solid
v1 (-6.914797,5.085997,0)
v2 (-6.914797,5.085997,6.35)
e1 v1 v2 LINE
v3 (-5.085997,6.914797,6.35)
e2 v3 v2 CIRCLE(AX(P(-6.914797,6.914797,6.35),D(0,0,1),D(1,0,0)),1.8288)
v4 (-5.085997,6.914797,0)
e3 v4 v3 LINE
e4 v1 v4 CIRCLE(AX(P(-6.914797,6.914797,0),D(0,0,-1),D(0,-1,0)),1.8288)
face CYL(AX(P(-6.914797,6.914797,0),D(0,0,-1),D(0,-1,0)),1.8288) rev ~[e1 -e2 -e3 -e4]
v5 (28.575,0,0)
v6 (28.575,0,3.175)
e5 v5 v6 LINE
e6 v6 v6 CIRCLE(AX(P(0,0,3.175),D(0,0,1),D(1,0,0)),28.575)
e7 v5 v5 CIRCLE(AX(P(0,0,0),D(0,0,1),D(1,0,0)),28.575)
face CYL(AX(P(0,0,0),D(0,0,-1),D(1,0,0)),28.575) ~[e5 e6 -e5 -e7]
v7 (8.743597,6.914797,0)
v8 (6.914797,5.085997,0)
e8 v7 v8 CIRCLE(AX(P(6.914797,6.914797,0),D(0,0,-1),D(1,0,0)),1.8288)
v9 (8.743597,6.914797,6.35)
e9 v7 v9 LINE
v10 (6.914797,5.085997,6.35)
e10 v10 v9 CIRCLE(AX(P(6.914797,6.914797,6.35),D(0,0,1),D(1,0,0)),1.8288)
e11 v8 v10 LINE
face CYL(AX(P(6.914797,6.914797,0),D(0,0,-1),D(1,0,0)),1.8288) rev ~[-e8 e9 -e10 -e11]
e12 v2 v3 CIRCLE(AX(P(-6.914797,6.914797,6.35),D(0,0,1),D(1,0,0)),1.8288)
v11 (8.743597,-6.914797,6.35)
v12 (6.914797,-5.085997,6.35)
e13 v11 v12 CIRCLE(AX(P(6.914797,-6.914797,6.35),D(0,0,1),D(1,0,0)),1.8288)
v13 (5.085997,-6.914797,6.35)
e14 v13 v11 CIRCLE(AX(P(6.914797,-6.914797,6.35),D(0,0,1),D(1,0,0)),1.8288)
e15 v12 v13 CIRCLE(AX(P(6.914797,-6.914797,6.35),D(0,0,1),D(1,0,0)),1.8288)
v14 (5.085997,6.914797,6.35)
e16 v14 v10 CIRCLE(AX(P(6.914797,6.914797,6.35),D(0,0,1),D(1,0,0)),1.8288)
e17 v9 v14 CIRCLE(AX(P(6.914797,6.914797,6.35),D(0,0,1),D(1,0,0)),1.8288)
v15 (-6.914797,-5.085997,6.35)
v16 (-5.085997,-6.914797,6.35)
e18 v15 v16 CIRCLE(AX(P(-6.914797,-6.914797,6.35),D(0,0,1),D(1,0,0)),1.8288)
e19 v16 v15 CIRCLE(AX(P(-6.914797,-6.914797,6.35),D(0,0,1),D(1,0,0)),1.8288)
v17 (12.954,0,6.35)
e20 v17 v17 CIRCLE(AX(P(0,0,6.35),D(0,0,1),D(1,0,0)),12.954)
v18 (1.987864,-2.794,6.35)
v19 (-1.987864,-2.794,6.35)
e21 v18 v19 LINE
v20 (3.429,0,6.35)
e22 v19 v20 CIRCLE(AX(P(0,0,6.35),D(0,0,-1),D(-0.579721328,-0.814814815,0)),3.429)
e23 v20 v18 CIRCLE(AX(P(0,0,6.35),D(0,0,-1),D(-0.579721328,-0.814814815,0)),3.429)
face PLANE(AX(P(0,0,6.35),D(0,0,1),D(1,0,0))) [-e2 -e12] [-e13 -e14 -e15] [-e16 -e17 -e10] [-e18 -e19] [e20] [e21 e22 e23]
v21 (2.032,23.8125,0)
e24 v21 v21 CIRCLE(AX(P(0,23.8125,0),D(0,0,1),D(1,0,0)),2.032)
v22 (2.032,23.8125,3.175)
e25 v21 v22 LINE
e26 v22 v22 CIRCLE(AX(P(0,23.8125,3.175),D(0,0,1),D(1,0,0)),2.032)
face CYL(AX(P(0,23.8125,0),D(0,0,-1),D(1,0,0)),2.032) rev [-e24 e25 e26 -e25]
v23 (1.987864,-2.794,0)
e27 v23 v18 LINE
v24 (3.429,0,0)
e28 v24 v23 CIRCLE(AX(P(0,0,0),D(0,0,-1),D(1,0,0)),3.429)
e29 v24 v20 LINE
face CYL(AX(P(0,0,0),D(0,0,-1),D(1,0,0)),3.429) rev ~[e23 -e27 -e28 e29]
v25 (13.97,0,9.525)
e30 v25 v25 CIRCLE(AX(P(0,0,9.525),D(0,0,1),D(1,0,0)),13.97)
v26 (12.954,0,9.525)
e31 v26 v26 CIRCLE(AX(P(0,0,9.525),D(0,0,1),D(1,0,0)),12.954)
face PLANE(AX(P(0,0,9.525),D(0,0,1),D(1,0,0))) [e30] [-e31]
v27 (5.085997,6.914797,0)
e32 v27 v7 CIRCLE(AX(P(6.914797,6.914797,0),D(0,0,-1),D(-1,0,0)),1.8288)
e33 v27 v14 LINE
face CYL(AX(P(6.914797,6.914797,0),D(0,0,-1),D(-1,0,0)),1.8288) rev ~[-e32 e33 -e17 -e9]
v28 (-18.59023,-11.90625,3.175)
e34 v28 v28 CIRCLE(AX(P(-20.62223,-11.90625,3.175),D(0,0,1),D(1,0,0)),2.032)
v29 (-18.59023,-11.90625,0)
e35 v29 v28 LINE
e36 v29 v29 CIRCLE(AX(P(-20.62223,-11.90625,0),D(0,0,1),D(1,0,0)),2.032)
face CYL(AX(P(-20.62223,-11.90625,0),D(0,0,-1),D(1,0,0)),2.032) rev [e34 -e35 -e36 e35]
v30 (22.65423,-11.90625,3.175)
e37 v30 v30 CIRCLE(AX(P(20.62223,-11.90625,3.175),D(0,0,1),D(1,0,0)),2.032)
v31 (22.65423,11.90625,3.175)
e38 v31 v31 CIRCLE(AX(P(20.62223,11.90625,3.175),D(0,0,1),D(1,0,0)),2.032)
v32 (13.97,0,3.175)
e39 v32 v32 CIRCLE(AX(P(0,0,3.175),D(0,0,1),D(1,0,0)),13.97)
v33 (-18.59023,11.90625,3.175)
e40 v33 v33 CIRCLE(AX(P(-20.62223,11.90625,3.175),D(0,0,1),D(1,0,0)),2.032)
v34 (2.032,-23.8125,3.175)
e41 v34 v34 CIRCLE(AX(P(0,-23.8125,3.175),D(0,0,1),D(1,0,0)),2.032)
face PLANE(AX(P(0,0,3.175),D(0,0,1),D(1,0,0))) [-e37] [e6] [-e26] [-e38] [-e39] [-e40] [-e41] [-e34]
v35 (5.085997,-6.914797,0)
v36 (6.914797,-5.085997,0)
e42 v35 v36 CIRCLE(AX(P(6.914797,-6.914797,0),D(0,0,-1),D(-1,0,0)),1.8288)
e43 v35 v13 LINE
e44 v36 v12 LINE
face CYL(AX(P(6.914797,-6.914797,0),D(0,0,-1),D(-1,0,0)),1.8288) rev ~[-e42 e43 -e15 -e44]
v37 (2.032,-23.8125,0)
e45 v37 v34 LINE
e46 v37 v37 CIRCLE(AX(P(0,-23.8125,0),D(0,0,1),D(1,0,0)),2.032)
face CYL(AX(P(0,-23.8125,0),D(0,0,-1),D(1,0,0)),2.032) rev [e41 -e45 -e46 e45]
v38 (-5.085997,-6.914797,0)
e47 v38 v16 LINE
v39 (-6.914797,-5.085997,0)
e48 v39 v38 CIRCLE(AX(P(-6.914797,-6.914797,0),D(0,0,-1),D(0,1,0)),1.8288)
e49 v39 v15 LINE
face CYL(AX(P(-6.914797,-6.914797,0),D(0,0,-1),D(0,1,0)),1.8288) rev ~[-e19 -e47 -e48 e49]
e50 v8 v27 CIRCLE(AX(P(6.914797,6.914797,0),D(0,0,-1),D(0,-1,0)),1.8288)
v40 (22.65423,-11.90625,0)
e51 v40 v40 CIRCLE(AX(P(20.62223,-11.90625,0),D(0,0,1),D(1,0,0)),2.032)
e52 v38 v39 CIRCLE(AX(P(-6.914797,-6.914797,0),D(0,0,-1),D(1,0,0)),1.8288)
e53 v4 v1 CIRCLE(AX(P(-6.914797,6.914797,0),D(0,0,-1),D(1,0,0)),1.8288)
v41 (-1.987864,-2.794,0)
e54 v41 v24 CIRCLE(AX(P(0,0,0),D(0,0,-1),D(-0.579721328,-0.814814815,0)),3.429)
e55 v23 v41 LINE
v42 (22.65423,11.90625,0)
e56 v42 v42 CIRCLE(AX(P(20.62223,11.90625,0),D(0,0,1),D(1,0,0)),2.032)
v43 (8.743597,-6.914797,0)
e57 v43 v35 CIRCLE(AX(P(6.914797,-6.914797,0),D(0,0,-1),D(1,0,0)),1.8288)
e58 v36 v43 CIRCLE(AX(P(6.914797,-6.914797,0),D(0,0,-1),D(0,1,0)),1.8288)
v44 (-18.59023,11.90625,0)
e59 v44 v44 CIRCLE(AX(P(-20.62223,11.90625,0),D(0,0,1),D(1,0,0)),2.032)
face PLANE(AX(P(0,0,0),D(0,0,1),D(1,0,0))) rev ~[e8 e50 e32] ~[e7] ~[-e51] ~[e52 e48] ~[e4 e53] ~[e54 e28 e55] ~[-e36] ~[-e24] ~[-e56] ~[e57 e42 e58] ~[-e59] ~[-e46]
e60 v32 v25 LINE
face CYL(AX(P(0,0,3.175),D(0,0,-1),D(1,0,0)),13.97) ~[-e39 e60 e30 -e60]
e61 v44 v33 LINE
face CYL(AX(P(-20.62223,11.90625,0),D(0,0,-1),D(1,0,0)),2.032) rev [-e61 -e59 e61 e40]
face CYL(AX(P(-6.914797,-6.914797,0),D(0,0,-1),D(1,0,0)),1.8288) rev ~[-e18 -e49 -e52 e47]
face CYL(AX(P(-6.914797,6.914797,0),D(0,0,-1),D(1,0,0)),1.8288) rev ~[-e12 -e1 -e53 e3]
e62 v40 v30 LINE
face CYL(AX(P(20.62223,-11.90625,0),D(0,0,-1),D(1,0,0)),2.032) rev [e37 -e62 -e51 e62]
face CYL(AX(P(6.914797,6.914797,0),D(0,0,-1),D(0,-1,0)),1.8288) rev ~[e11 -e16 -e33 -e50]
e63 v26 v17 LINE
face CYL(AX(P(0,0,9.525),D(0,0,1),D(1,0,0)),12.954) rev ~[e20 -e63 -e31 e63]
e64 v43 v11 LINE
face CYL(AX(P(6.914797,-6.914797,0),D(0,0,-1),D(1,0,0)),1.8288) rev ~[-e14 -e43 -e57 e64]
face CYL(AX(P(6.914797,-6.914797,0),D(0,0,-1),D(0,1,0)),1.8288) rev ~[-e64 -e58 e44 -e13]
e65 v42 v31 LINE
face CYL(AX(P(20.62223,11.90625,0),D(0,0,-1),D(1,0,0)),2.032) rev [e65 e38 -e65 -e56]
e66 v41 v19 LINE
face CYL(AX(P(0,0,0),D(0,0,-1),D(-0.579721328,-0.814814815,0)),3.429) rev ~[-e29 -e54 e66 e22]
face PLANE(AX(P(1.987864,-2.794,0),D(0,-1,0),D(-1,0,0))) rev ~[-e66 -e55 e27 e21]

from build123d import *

# Parameters (mm, degrees)
F0_R     = 28.575
F0_R_2   = 2.032
F1_DEPTH = 3.175
F2_R     = 13.97
F3_DEPTH = 6.35
F5_DEPTH = 9.525
F7_DEPTH = 9.525
F8_R     = 12.954
F8_R_2   = 1.8288
F9_DEPTH = 3.175


with BuildPart() as f1:
    # F0 (on Top) → F1 (new body)
    with BuildSketch(Plane.XY):
        Circle(F0_R)
        with Locations((-20.6222299276, -11.90625)):
            Circle(F0_R_2, mode=Mode.SUBTRACT)
        with Locations((0, -23.8125)):
            Circle(F0_R_2, mode=Mode.SUBTRACT)
        with Locations((20.6222299276, -11.90625)):
            Circle(F0_R_2, mode=Mode.SUBTRACT)
        with Locations((-20.6222299276, 11.90625)):
            Circle(F0_R_2, mode=Mode.SUBTRACT)
        with Locations((20.6222299276, 11.90625)):
            Circle(F0_R_2, mode=Mode.SUBTRACT)
        with Locations((0, 23.8125)):
            Circle(F0_R_2, mode=Mode.SUBTRACT)
    extrude(amount=F1_DEPTH)

    # F2 (on face) → F3 (join)
    with BuildSketch(Plane.XY.offset(3.175)):
        Circle(F2_R)
    extrude(amount=F3_DEPTH)

    # F4 (on face) → F5 (cut, through all)
    with BuildSketch(Plane(origin=(0, 0, 0), x_dir=(1, 0, 0), z_dir=(0, 0, -1))):
        with BuildLine():
            ThreePointArc((-1.987864432, 2.794), (-1.5718864244, -3.0474930793), (3.429, 0))
            ThreePointArc((3.429, 0), (3.0474930793, 1.5718864244), (1.987864432, 2.794))
            Line((1.987864432, 2.794), (0, 2.794))
            Line((0, 2.794), (-1.987864432, 2.794))
        make_face()
    extrude(amount=-F5_DEPTH, mode=Mode.SUBTRACT)

    # F6 (on face) → F7 (cut, through all)
    with BuildSketch(Plane(origin=(0, 0, 0), x_dir=(1, 0, 0), z_dir=(0, 0, -1))):
        with BuildLine():
            Line((-6.9147972132, -6.9147972132), (-5.0859972132, -6.9147972132))
            ThreePointArc((-5.0859972132, -6.9147972132), (-5.6216403318, -5.6216403318), (-6.9147972132, -5.0859972132))
            Line((-6.9147972132, -5.0859972132), (-6.9147972132, -6.9147972132))
        make_face()
        with BuildLine():
            ThreePointArc((-6.9147972132, -5.0859972132), (-8.2079540947, -8.2079540947), (-5.0859972132, -6.9147972132))
            Line((-5.0859972132, -6.9147972132), (-6.9147972132, -6.9147972132))
            Line((-6.9147972132, -6.9147972132), (-6.9147972132, -5.0859972132))
        make_face()
        with BuildLine():
            Line((-6.9147972132, 6.9147972132), (-6.9147972132, 5.0859972132))
            ThreePointArc((-6.9147972132, 5.0859972132), (-5.6216403318, 5.6216403318), (-5.0859972132, 6.9147972132))
            Line((-5.0859972132, 6.9147972132), (-6.9147972132, 6.9147972132))
        make_face()
        with BuildLine():
            ThreePointArc((-5.0859972132, 6.9147972132), (-8.2079540947, 8.2079540947), (-6.9147972132, 5.0859972132))
            Line((-6.9147972132, 5.0859972132), (-6.9147972132, 6.9147972132))
            Line((-6.9147972132, 6.9147972132), (-5.0859972132, 6.9147972132))
        make_face()
        with BuildLine():
            Line((6.9147972132, 6.9147972132), (6.9147972132, 5.0859972132))
            ThreePointArc((6.9147972132, 5.0859972132), (8.2079540947, 5.6216403318), (8.7435972132, 6.9147972132))
            ThreePointArc((8.7435972132, 6.9147972132), (6.9147972132, 8.7435972132), (5.0859972132, 6.9147972132))
            Line((5.0859972132, 6.9147972132), (6.9147972132, 6.9147972132))
        make_face()
        with BuildLine():
            ThreePointArc((5.0859972132, 6.9147972132), (5.6216403318, 5.6216403318), (6.9147972132, 5.0859972132))
            Line((6.9147972132, 5.0859972132), (6.9147972132, 6.9147972132))
            Line((6.9147972132, 6.9147972132), (5.0859972132, 6.9147972132))
        make_face()
        with BuildLine():
            ThreePointArc((6.9147972132, -5.0859972132), (5.6216403318, -5.6216403318), (5.0859972132, -6.9147972132))
            Line((5.0859972132, -6.9147972132), (6.9147972132, -6.9147972132))
            Line((6.9147972132, -6.9147972132), (6.9147972132, -5.0859972132))
        make_face()
        with BuildLine():
            Line((6.9147972132, -6.9147972132), (5.0859972132, -6.9147972132))
            ThreePointArc((5.0859972132, -6.9147972132), (6.9147972132, -8.7435972132), (8.7435972132, -6.9147972132))
            ThreePointArc((8.7435972132, -6.9147972132), (8.2079540947, -5.6216403318), (6.9147972132, -5.0859972132))
            Line((6.9147972132, -5.0859972132), (6.9147972132, -6.9147972132))
        make_face()
    extrude(amount=-F7_DEPTH, mode=Mode.SUBTRACT)

    # F8 (on face) → F9 (cut)
    with BuildSketch(Plane.XY.offset(9.525)):
        Circle(F8_R)
        with Locations((-6.9147972132, -6.9147972132)):
            Circle(F8_R_2, mode=Mode.SUBTRACT)
        with Locations((6.9147972132, -6.9147972132)):
            Circle(F8_R_2, mode=Mode.SUBTRACT)
        with BuildLine():
            ThreePointArc((-1.987864432, -2.794), (0, 3.429), (1.987864432, -2.794))
            Line((1.987864432, -2.794), (-1.987864432, -2.794))
        make_face(mode=Mode.SUBTRACT)
        with Locations((-6.9147972132, 6.9147972132)):
            Circle(F8_R_2, mode=Mode.SUBTRACT)
        with Locations((6.9147972132, 6.9147972132)):
            Circle(F8_R_2, mode=Mode.SUBTRACT)
    extrude(amount=-F9_DEPTH, mode=Mode.SUBTRACT)


solid = f1.part
